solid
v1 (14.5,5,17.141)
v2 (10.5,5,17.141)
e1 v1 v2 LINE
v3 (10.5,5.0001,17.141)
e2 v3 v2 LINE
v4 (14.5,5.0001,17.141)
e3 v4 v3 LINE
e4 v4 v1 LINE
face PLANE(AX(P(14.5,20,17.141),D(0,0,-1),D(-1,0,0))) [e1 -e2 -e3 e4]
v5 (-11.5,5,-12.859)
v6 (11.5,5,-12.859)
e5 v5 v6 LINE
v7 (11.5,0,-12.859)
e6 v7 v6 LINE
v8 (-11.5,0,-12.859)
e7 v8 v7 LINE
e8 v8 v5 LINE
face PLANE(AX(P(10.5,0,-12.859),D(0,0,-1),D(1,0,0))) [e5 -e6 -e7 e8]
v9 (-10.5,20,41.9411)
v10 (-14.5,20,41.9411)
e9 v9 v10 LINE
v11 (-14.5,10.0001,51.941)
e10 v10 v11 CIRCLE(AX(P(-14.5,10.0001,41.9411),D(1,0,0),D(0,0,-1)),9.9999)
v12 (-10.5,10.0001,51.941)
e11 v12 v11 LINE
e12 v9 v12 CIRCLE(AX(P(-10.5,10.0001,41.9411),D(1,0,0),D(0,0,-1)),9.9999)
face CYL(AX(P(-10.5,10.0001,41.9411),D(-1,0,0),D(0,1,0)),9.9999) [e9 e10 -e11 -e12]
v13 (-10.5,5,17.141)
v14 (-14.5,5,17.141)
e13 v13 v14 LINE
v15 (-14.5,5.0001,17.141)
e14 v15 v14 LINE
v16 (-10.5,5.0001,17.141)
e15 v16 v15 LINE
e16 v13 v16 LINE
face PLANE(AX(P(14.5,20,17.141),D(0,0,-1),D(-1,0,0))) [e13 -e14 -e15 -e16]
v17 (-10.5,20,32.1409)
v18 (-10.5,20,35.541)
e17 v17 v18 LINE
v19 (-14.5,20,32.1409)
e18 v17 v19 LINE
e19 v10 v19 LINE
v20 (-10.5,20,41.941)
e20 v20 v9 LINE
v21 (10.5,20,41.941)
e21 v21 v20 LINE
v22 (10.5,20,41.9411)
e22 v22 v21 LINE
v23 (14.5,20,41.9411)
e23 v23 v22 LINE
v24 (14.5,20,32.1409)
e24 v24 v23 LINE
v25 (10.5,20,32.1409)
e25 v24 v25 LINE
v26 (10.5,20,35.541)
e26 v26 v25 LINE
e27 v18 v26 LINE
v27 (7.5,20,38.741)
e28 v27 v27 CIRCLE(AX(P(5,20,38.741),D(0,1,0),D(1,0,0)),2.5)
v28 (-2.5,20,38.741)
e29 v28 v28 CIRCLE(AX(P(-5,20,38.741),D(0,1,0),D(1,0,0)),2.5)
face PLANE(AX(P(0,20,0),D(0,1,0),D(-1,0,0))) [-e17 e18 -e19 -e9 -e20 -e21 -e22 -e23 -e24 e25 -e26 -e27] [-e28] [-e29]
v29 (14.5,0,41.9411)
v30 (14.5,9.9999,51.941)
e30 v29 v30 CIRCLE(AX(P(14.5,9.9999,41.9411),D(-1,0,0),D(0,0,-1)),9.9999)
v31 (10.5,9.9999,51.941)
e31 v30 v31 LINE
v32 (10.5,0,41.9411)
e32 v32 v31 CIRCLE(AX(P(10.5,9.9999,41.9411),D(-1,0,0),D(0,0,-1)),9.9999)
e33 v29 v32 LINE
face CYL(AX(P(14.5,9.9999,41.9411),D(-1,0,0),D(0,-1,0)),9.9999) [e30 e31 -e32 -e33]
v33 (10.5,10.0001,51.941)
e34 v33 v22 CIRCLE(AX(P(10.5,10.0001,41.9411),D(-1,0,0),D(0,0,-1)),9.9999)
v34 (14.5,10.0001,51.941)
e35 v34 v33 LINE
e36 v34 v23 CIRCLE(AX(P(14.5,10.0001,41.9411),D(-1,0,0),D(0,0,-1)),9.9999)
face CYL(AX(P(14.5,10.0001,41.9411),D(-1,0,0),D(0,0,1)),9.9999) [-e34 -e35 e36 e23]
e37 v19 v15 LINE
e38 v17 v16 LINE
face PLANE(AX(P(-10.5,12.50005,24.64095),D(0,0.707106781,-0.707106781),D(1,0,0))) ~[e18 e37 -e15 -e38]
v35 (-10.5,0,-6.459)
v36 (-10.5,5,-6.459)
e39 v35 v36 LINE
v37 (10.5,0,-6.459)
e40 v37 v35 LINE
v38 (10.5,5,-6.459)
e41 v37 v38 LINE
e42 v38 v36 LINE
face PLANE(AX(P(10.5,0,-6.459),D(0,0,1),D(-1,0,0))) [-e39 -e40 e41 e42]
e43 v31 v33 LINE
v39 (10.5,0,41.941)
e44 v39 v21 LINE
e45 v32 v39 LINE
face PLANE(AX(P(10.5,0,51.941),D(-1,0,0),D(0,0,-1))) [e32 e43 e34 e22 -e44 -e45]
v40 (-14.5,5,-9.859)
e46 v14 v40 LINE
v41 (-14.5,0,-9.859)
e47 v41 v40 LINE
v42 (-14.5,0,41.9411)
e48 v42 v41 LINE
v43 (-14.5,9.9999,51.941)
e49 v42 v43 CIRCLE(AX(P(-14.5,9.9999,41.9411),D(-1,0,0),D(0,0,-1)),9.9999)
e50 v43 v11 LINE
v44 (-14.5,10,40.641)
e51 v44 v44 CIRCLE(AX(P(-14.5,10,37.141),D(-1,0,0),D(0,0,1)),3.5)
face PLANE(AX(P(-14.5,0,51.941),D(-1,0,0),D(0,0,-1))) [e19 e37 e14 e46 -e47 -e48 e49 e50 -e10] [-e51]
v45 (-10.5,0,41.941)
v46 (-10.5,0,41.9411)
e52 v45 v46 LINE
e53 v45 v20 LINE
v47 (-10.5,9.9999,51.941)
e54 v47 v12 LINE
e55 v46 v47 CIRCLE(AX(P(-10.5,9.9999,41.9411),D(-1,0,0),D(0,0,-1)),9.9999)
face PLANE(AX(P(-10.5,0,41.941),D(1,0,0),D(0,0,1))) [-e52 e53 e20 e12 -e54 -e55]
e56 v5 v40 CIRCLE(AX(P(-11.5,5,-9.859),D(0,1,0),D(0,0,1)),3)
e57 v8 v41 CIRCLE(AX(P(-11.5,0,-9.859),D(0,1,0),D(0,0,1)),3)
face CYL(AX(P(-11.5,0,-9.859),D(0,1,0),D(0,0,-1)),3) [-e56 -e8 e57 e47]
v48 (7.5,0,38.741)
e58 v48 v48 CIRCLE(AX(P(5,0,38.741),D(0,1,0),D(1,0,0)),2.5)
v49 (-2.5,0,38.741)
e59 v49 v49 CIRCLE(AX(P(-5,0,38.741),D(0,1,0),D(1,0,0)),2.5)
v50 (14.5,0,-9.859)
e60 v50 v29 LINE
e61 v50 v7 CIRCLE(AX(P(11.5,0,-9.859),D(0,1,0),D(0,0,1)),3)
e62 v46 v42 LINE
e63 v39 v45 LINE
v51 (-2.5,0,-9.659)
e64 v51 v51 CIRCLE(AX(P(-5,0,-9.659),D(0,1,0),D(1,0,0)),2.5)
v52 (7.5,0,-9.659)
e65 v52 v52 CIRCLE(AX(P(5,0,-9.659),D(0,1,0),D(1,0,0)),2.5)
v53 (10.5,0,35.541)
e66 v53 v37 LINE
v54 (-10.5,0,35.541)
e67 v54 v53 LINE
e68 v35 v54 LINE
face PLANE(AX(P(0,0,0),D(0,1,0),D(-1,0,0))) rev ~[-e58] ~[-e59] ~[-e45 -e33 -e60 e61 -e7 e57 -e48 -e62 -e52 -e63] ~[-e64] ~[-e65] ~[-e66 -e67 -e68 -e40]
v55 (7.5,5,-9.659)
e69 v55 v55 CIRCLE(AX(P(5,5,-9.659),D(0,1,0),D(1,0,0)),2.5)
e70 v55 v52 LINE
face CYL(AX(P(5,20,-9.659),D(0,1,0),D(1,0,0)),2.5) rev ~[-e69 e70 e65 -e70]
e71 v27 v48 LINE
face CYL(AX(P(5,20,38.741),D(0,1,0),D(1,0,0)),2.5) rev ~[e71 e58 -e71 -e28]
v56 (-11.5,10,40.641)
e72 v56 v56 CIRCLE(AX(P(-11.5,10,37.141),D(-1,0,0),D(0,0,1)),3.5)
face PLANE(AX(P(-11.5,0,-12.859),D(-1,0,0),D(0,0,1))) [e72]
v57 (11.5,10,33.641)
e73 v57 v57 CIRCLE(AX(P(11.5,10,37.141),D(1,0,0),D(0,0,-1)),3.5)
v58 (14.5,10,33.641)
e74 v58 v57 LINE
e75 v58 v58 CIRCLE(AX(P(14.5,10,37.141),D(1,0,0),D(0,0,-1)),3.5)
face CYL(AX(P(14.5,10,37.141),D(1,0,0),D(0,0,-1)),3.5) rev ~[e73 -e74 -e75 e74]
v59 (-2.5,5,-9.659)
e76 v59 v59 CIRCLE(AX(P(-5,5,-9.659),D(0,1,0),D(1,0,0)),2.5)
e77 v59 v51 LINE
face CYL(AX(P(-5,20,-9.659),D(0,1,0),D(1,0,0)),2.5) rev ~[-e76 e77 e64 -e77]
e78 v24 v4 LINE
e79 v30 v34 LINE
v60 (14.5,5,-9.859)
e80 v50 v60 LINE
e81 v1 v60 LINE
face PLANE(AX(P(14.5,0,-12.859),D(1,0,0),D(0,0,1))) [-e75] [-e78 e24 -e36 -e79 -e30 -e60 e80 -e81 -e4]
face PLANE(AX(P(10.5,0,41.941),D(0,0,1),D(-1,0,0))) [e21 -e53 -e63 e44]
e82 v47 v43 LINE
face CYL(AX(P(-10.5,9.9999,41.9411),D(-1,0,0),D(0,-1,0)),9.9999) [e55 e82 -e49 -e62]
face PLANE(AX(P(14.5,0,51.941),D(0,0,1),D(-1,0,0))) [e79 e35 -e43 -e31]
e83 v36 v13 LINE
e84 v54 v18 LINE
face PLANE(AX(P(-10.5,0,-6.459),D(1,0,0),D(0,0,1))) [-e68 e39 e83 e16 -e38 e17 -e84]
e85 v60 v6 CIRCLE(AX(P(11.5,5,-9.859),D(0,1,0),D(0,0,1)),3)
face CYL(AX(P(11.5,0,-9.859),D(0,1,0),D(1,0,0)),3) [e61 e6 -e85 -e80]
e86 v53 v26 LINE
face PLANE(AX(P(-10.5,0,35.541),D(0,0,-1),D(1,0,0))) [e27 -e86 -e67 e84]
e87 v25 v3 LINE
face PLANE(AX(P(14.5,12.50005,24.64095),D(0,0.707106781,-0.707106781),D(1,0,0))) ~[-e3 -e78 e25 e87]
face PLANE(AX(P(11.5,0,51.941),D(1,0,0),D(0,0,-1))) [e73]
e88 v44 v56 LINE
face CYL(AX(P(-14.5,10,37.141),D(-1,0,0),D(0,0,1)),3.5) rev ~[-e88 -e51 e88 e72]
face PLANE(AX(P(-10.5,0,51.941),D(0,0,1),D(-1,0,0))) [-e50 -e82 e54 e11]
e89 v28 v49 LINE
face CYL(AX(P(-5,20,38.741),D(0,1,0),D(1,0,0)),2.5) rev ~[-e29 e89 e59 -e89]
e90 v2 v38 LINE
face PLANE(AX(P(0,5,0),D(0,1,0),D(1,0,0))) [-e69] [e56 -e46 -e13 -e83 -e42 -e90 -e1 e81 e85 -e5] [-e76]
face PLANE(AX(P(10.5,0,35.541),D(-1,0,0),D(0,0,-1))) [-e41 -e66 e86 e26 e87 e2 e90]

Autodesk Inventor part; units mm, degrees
ref_plane "YZ Plane" through (0, 0, 0) normal (1, 0, 0) x (0, 1, 0)
ref_plane "XZ Plane" through (0, 0, 0) normal (0, 1, 0) x (-1, 0, 0)
ref_plane "XY Plane" through (0, 0, 0) normal (0, 0, 1) x (1, 0, 0)
sketch "Esquisse1" plane through (0, 0, 0) normal (0, 1, 0) x (-1, 0, 0)
  line L0 (-14.5, 51.941) -> (-10.5, 51.941)
  line L1 (-10.5, 51.941) -> (-10.5, -12.859)
  line L2 (-10.5, -12.859) -> (-14.5, -12.859)
  line L3 (-14.5, -12.859) -> (-14.5, 51.941)
  line L4 (10.5, 51.941) -> (14.5, 51.941)
  line L5 (14.5, 51.941) -> (14.5, -12.859)
  line L6 (14.5, -12.859) -> (10.5, -12.859)
  line L7 (10.5, -12.859) -> (10.5, 51.941)
  line L8 (-10.5, -6.459) -> (10.5, -6.459)
  line L9 (10.5, -6.459) -> (10.5, -12.859)
  line L10 (10.5, -12.859) -> (-10.5, -12.859)
  line L11 (-10.5, -12.859) -> (-10.5, -6.459)
  line L12 (-10.5, 41.941) -> (10.5, 41.941)
  line L13 (10.5, 41.941) -> (10.5, 35.541)
  line L14 (10.5, 35.541) -> (-10.5, 35.541)
  line L15 (-10.5, 35.541) -> (-10.5, 41.941)
  line L16 (10.5, -12.859) -> (14.5, -12.859)
  point P0 (0, 0)
  dimension "d1" = 6.4
  dimension "d2" = 21
  dimension "d3" = 4
  dimension "d4" = 4
  dimension "d5" = 10.5
  dimension "d6" = 42
  dimension "d7" = 10
  dimension "d8" = 35.541
  dimension "d9" = 6.4
extrude "Extrusion1" add sketch "Esquisse1" along normal blind 20 contours L0 L1 L2 L3 | L12 L7 L14 L1 | L1 L8 L7 L10 | L7 L4 L5 L6
sketch "Esquisse2" plane through (14.5, 0, 51.941) normal (1, 0, 0) x (0, 0, -1)
  line L0 (64.8, 0) -> (64.8, 20) projected
  line L1 (0, 0) -> (0, 20) projected
  line L2 (0, 10) -> (64.8, 10) construction
  circle A0 centre (14.8, 10) radius 3.5
  point P0 (51.941, 0)
  dimension "d12" = 50
  dimension "d13" = 7
extrude "Extrusion2" cut sketch "Esquisse2" against normal blind 3
sketch "Esquisse3" plane through (-14.5, 0, -12.859) normal (-1, 0, 0) x (0, 0, 1)
  line L0 (64.8, 0) -> (64.8, 20) projected
  line L1 (0, 0) -> (0, 20) projected
  line L2 (64.8, 10) -> (0, 10) construction
  circle A0 centre (50, 10) radius 3.5
  point P0 (12.859, 0)
  dimension "d16" = 50
  dimension "d17" = 7
extrude "Extrusion3" cut sketch "Esquisse3" against normal blind 3
sketch "Esquisse5" plane through (0, 20, 0) normal (0, 1, 0) x (1, 0, 0)
  line L0 (10.5, -35.541) -> (-10.5, -35.541) projected
  line L1 (14.5, 12.859) -> (-14.5, 12.859) projected
  line L2 (-10.5, -41.941) -> (10.5, -41.941) projected
  line L3 (-9.9, 12.859) -> (9.9, 12.859)
  line L4 (9.9, 12.859) -> (9.9, 6.459)
  line L5 (9.9, 6.459) -> (-9.9, 6.459)
  line L6 (-9.9, 6.459) -> (-9.9, 12.859)
  line L7 (-9.9, -41.941) -> (9.9, -41.941)
  line L8 (9.9, -41.941) -> (9.9, -35.541)
  line L9 (9.9, -35.541) -> (-9.9, -35.541)
  line L10 (-9.9, -35.541) -> (-9.9, -41.941)
  line L11 (0, 12.859) -> (0, -41.941)
  circle A0 centre (5, 9.659) radius 2.5
  circle A1 centre (5, -38.741) radius 2.5
  circle A2 centre (-5, 9.659) radius 2.5
  circle A3 centre (-5, -38.741) radius 2.5
  point P0 (0, 0)
  dimension "d29" = 6.4
  dimension "d30" = 6.4
  dimension "d31" = 19.8
  dimension "d32" = 9.9
  dimension "d33" = 5
  dimension "d34" = 5
  dimension "d35" = 5
  dimension "d36" = 5
  dimension "d37" = 3.2
  dimension "d38" = 3.2
extrude "Extrusion5" cut sketch "Esquisse5" against normal through all contours A0 | A1 | A2 | A3
sketch "Esquisse6" plane through (0, 20, 0) normal (0, 1, 0) x (1, 0, 0)
  circle A0 centre (-5, 9.659) radius 2.5 projected
  circle A1 centre (5, 9.659) radius 2.5 projected
  line L0 (14.5, -51.941) -> (14.5, 12.859) projected
  line L1 (-14.5, 12.859) -> (14.5, 12.859)
  line L2 (14.5, 12.859) -> (14.5, -17.141)
  line L3 (14.5, -17.141) -> (-14.5, -17.141)
  line L4 (-14.5, -17.141) -> (-14.5, 12.859)
  point P0 (0, 0)
  dimension "d41" = 30
extrude "Extrusion6" cut sketch "Esquisse6" against normal blind 15
chamfer "Chanfrein1" distance 15 angle 45 2 edges at (12.5, 20, 17.141) (-12.5, 20, 17.141)
fillet "Congé1" radius 3 2 edges at (-14.5, 2.5, -12.859) (14.5, 2.5, -12.859)
fillet "Congé2" radius 10 4 edges at (-12.5, 0, 51.941) (12.5, 0, 51.941) (-12.5, 20, 51.941) (12.5, 20, 51.941)
equation "\"d4\" = d3"
equation "\"d5\" = 0.5 * d2"
equation "\"d9\" = d1"
equation "\"d30\" = d29"
equation "\"d32\" = 0.5 * d31"
equation "\"d34\" = d33"
equation "\"d38\" = d37"
properties part number "new_shoulder_modified"
